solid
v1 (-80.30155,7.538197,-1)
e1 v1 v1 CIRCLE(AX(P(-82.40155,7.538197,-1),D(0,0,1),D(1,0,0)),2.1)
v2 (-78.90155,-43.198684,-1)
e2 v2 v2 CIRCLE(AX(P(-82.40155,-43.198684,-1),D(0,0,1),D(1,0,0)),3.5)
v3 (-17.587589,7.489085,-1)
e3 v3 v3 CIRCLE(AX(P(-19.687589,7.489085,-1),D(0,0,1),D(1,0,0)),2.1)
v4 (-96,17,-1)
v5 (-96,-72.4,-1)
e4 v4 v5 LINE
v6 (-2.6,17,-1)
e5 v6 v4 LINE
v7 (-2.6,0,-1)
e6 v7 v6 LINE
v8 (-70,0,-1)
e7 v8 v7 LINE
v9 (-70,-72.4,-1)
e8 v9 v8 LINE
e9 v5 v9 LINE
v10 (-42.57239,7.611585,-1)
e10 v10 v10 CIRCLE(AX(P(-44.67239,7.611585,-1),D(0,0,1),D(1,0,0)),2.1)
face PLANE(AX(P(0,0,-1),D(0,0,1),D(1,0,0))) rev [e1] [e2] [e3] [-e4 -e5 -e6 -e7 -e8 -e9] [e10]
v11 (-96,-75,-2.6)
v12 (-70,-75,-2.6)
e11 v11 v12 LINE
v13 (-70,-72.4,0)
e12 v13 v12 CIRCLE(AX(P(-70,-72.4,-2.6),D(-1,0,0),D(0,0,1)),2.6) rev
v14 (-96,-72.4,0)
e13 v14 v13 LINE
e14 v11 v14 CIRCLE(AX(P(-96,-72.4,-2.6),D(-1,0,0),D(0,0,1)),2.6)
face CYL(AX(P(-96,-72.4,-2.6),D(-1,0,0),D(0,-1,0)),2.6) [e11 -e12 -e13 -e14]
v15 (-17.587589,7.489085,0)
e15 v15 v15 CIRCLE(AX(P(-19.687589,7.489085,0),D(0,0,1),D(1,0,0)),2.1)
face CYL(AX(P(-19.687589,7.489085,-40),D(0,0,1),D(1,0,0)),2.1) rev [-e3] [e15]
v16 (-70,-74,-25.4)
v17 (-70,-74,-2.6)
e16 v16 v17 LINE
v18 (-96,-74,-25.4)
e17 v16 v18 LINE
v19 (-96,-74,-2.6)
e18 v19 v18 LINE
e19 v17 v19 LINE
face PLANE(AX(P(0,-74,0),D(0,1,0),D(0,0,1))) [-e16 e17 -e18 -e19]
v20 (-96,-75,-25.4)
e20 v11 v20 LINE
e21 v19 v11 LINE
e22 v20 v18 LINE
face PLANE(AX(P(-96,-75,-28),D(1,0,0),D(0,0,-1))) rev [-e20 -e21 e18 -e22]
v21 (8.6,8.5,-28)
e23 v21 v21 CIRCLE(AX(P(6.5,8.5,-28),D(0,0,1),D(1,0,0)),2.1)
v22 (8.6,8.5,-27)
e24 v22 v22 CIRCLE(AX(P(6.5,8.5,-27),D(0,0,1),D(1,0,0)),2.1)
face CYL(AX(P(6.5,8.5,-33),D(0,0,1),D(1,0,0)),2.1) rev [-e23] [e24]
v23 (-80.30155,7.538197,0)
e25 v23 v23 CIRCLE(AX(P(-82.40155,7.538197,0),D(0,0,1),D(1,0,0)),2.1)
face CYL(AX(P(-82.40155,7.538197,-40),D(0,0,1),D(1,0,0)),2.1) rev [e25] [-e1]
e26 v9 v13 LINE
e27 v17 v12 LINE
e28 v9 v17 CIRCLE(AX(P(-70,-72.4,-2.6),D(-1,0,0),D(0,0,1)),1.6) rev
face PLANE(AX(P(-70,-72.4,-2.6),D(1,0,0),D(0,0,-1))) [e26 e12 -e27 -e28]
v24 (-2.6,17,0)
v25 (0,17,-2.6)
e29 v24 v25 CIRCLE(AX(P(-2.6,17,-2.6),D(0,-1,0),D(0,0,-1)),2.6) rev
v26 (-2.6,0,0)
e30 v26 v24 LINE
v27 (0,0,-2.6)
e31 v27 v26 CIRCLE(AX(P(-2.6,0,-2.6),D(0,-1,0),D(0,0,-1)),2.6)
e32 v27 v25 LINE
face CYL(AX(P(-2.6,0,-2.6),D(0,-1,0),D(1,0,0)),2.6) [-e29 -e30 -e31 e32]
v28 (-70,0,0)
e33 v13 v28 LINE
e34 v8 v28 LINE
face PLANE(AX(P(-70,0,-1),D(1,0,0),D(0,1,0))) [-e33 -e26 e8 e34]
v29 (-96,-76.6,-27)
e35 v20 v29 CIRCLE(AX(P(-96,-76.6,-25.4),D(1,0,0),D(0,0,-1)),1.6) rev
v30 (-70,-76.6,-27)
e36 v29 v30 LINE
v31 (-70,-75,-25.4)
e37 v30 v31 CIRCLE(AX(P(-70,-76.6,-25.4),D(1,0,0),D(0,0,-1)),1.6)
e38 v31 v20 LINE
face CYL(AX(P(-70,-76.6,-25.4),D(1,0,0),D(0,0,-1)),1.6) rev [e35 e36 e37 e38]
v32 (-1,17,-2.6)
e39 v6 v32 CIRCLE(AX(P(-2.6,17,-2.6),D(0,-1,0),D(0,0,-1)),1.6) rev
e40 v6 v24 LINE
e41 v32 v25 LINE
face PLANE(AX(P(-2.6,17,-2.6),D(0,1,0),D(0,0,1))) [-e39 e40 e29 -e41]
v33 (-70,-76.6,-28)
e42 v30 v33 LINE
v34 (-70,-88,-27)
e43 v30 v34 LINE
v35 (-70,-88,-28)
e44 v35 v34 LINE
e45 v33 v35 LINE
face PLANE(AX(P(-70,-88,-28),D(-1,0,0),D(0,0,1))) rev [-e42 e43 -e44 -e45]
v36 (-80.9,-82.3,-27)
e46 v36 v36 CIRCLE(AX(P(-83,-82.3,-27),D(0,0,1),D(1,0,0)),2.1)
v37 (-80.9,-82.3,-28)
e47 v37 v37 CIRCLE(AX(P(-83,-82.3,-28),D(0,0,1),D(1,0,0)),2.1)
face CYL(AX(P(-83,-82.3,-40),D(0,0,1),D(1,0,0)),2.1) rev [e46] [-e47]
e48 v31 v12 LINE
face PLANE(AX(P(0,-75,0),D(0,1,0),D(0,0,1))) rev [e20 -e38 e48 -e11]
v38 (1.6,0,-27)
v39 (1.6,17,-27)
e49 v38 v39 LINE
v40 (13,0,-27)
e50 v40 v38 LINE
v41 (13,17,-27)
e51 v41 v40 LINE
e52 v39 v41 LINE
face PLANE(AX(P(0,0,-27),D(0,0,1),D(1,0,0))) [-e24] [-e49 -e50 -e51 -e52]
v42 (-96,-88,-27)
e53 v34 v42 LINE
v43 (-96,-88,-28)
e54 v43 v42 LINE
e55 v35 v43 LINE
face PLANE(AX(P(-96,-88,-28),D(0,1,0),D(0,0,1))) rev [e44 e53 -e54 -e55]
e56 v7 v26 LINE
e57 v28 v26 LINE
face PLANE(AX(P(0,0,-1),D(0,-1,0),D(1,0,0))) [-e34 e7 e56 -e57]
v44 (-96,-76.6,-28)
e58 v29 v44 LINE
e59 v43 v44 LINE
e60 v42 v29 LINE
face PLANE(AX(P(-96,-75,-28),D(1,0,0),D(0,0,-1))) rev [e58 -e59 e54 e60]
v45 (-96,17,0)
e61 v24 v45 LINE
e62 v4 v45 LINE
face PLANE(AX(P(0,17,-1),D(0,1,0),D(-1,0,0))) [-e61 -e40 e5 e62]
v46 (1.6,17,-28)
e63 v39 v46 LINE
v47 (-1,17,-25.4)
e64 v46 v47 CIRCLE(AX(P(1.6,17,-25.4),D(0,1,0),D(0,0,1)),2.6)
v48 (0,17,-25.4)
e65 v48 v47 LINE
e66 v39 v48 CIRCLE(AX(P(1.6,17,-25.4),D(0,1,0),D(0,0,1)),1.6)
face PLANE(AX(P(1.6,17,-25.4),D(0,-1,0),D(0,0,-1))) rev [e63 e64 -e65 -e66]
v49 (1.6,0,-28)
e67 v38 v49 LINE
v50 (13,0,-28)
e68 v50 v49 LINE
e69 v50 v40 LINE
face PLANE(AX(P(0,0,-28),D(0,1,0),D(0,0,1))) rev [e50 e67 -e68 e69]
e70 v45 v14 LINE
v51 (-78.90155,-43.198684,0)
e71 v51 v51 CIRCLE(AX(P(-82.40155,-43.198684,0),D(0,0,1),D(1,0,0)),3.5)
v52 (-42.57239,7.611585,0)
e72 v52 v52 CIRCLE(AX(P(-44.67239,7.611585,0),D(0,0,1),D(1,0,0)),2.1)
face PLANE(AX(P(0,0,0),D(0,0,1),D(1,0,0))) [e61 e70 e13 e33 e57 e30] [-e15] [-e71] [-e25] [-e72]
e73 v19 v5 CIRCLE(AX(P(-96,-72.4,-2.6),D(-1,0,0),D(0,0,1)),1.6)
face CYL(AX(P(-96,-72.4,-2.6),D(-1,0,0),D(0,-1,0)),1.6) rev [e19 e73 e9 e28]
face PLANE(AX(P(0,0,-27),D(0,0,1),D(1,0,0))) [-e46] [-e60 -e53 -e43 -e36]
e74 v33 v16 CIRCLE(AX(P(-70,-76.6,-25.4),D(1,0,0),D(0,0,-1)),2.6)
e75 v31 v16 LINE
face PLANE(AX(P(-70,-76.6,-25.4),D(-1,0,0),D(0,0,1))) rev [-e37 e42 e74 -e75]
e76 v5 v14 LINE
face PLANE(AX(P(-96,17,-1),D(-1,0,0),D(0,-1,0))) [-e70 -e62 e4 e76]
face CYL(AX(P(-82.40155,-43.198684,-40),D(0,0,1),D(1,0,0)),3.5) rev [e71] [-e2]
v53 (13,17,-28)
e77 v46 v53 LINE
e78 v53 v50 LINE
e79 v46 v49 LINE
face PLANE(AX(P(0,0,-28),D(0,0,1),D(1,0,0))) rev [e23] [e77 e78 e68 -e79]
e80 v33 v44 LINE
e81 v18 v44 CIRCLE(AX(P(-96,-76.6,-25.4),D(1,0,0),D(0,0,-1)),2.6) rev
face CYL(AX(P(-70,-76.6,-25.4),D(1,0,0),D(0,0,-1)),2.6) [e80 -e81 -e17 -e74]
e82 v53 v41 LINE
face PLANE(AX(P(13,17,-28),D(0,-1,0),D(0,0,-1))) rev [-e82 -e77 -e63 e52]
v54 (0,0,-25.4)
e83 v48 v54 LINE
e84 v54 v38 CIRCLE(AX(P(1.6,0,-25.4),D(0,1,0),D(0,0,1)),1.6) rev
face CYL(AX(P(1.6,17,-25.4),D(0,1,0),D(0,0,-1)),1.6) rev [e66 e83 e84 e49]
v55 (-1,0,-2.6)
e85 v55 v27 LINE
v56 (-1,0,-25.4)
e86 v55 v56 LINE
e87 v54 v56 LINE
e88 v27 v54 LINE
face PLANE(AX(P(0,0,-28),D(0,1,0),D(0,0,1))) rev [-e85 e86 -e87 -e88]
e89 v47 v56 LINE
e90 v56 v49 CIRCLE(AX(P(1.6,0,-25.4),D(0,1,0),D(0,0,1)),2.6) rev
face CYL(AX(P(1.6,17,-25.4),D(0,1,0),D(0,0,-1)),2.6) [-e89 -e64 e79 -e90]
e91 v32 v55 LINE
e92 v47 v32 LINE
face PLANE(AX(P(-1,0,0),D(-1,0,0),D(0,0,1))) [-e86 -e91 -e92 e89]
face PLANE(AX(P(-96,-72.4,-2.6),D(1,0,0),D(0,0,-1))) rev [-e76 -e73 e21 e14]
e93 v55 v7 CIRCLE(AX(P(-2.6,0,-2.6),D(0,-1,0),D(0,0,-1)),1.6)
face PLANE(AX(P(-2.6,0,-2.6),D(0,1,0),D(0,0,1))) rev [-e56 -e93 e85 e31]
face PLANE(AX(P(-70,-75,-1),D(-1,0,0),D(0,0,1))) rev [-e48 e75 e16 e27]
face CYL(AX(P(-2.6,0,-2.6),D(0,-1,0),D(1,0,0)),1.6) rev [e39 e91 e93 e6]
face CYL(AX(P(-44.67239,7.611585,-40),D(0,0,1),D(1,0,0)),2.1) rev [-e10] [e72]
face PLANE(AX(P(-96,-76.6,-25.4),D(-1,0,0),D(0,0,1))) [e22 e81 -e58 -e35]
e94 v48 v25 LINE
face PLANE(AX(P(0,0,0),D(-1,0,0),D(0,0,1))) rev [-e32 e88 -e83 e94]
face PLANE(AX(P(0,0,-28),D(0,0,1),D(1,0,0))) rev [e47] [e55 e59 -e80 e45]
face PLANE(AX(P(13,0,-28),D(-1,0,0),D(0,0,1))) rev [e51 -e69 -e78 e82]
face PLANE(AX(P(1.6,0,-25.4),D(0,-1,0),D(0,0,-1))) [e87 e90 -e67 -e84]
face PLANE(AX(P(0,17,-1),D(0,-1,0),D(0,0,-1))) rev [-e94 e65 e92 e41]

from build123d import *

# Parameters (mm, degrees)
BASE_FLANGE1_DEPTH           = 1
EDGE_FLANGE1_STRIP_W         = 7.2
EDGE_FLANGE1_STRIP_H         = 1
EDGE_FLANGE1_STRIP_CUT_DEPTH = 17
EDGE_FLANGE1_DEPTH           = 17
EDGE_FLANGE2_STRIP_W         = 7.2
EDGE_FLANGE2_STRIP_H         = 1
EDGE_FLANGE2_STRIP_CUT_DEPTH = 17
EDGE_FLANGE2_DEPTH           = 17
EDGE_FLANGE3_STRIP_W         = 7.2
EDGE_FLANGE3_STRIP_H         = 1
EDGE_FLANGE3_STRIP_CUT_DEPTH = 26
EDGE_FLANGE3_DEPTH           = 26
EDGE_FLANGE4_STRIP_W         = 7.2
EDGE_FLANGE4_STRIP_H         = 1
EDGE_FLANGE4_STRIP_CUT_DEPTH = 26
EDGE_FLANGE4_DEPTH           = 26
SKETCH18_R                   = 2.1
CUT_EXTRUDE1_DEPTH           = 6
SKETCH19_R                   = 2.1
CUT_EXTRUDE2_DEPTH           = 40
SKETCH20_R                   = 3.5
CUT_EXTRUDE3_DEPTH           = 40


# Sheet-metal steps are written as plain solids
with BuildPart() as part:
    # Sketch1 → Base-Flange1 (new body)
    with BuildSketch(Plane.XY):
        Polygon((0, 0), (0, 17), (-96, 17), (-96, -75), (-70, -75), (-70, 0), align=None)
    extrude(amount=-BASE_FLANGE1_DEPTH)

    # Edge-Flange1 strip (across the edge) → Edge-Flange1 strip cut (cut)
    with BuildSketch(Plane(origin=(0, 17, -1), x_dir=(-1, 0, 0), z_dir=(0, -1, 0))):
        with Locations((-1, -0.5)):
            Rectangle(EDGE_FLANGE1_STRIP_W, EDGE_FLANGE1_STRIP_H)
    extrude(amount=EDGE_FLANGE1_STRIP_CUT_DEPTH, mode=Mode.SUBTRACT)

    # Edge-Flange1 section (across the edge) → Edge-Flange1 (add)
    with BuildSketch(Plane(origin=(0, 17, -1), x_dir=(-1, 0, 0), z_dir=(0, -1, 0))):
        with BuildLine():
            Line((0, 1.6), (0, 27))
            Line((0, 27), (1, 27))
            Line((1, 27), (1, 1.6))
            ThreePointArc((1, 1.6), (1.46862915, 0.46862915), (2.6, 0))
            Line((2.6, 0), (2.6, -1))
            ThreePointArc((2.6, -1), (0.761522369, -0.238477631), (0, 1.6))
        make_face()
    extrude(amount=EDGE_FLANGE1_DEPTH)

    # Edge-Flange2 strip (across the edge) → Edge-Flange2 strip cut (cut)
    with BuildSketch(Plane(origin=(0, 0, -28), x_dir=(0, 0, 1), z_dir=(0, 1, 0))):
        with Locations((-1, -0.5)):
            Rectangle(EDGE_FLANGE2_STRIP_W, EDGE_FLANGE2_STRIP_H)
    extrude(amount=EDGE_FLANGE2_STRIP_CUT_DEPTH, mode=Mode.SUBTRACT)

    # Edge-Flange2 section (across the edge) → Edge-Flange2 (add)
    with BuildSketch(Plane(origin=(0, 0, -28), x_dir=(0, 0, 1), z_dir=(0, 1, 0))):
        with BuildLine():
            Line((0, 1.6), (0, 13))
            Line((0, 13), (1, 13))
            Line((1, 13), (1, 1.6))
            ThreePointArc((1, 1.6), (1.46862915, 0.46862915), (2.6, 0))
            Line((2.6, 0), (2.6, -1))
            ThreePointArc((2.6, -1), (0.761522369, -0.238477631), (0, 1.6))
        make_face()
    extrude(amount=EDGE_FLANGE2_DEPTH)

    # Edge-Flange3 strip (across the edge) → Edge-Flange3 strip cut (cut)
    with BuildSketch(Plane(origin=(-70, -75, -1), x_dir=(0, 1, 0), z_dir=(-1, 0, 0))):
        with Locations((-1, -0.5)):
            Rectangle(EDGE_FLANGE3_STRIP_W, EDGE_FLANGE3_STRIP_H)
    extrude(amount=EDGE_FLANGE3_STRIP_CUT_DEPTH, mode=Mode.SUBTRACT)

    # Edge-Flange3 section (across the edge) → Edge-Flange3 (add)
    with BuildSketch(Plane(origin=(-70, -75, -1), x_dir=(0, 1, 0), z_dir=(-1, 0, 0))):
        with BuildLine():
            Line((0, 1.6), (0, 27))
            Line((0, 27), (1, 27))
            Line((1, 27), (1, 1.6))
            ThreePointArc((1, 1.6), (1.46862915, 0.46862915), (2.6, 0))
            Line((2.6, 0), (2.6, -1))
            ThreePointArc((2.6, -1), (0.761522369, -0.238477631), (0, 1.6))
        make_face()
    extrude(amount=EDGE_FLANGE3_DEPTH)

    # Edge-Flange4 strip (across the edge) → Edge-Flange4 strip cut (cut)
    with BuildSketch(Plane(origin=(-96, -75, -28), x_dir=(0, 0, 1), z_dir=(1, 0, 0))):
        with Locations((-1, -0.5)):
            Rectangle(EDGE_FLANGE4_STRIP_W, EDGE_FLANGE4_STRIP_H)
    extrude(amount=EDGE_FLANGE4_STRIP_CUT_DEPTH, mode=Mode.SUBTRACT)

    # Edge-Flange4 section (across the edge) → Edge-Flange4 (add)
    with BuildSketch(Plane(origin=(-96, -75, -28), x_dir=(0, 0, 1), z_dir=(1, 0, 0))):
        with BuildLine():
            Line((0, 1.6), (0, 13))
            Line((0, 13), (1, 13))
            Line((1, 13), (1, 1.6))
            ThreePointArc((1, 1.6), (1.46862915, 0.46862915), (2.6, 0))
            Line((2.6, 0), (2.6, -1))
            ThreePointArc((2.6, -1), (0.761522369, -0.238477631), (0, 1.6))
        make_face()
    extrude(amount=EDGE_FLANGE4_DEPTH)

    # Sketch18 → Cut-Extrude1 (cut)
    with BuildSketch(Plane.XY.offset(-27)):
        with Locations((6.5, 8.5)):
            Circle(SKETCH18_R)
    extrude(amount=-CUT_EXTRUDE1_DEPTH, mode=Mode.SUBTRACT)

    # Sketch19 → Cut-Extrude2 (cut)
    with BuildSketch(Plane.XY):
        with Locations((-44.672390486, 7.611585351)):
            Circle(SKETCH19_R)
        with Locations((-82.401549953, 7.538197483)):
            Circle(SKETCH19_R)
        with Locations((-83, -82.3)):
            Circle(SKETCH19_R)
        with Locations((-19.687589167, 7.489085351)):
            Circle(SKETCH19_R)
    extrude(amount=-CUT_EXTRUDE2_DEPTH, mode=Mode.SUBTRACT)

    # Sketch20 → Cut-Extrude3 (cut)
    with BuildSketch(Plane.XY):
        with Locations((-82.401549953, -43.198683771)):
            Circle(SKETCH20_R)
    extrude(amount=-CUT_EXTRUDE3_DEPTH, mode=Mode.SUBTRACT)


solid = part.part
